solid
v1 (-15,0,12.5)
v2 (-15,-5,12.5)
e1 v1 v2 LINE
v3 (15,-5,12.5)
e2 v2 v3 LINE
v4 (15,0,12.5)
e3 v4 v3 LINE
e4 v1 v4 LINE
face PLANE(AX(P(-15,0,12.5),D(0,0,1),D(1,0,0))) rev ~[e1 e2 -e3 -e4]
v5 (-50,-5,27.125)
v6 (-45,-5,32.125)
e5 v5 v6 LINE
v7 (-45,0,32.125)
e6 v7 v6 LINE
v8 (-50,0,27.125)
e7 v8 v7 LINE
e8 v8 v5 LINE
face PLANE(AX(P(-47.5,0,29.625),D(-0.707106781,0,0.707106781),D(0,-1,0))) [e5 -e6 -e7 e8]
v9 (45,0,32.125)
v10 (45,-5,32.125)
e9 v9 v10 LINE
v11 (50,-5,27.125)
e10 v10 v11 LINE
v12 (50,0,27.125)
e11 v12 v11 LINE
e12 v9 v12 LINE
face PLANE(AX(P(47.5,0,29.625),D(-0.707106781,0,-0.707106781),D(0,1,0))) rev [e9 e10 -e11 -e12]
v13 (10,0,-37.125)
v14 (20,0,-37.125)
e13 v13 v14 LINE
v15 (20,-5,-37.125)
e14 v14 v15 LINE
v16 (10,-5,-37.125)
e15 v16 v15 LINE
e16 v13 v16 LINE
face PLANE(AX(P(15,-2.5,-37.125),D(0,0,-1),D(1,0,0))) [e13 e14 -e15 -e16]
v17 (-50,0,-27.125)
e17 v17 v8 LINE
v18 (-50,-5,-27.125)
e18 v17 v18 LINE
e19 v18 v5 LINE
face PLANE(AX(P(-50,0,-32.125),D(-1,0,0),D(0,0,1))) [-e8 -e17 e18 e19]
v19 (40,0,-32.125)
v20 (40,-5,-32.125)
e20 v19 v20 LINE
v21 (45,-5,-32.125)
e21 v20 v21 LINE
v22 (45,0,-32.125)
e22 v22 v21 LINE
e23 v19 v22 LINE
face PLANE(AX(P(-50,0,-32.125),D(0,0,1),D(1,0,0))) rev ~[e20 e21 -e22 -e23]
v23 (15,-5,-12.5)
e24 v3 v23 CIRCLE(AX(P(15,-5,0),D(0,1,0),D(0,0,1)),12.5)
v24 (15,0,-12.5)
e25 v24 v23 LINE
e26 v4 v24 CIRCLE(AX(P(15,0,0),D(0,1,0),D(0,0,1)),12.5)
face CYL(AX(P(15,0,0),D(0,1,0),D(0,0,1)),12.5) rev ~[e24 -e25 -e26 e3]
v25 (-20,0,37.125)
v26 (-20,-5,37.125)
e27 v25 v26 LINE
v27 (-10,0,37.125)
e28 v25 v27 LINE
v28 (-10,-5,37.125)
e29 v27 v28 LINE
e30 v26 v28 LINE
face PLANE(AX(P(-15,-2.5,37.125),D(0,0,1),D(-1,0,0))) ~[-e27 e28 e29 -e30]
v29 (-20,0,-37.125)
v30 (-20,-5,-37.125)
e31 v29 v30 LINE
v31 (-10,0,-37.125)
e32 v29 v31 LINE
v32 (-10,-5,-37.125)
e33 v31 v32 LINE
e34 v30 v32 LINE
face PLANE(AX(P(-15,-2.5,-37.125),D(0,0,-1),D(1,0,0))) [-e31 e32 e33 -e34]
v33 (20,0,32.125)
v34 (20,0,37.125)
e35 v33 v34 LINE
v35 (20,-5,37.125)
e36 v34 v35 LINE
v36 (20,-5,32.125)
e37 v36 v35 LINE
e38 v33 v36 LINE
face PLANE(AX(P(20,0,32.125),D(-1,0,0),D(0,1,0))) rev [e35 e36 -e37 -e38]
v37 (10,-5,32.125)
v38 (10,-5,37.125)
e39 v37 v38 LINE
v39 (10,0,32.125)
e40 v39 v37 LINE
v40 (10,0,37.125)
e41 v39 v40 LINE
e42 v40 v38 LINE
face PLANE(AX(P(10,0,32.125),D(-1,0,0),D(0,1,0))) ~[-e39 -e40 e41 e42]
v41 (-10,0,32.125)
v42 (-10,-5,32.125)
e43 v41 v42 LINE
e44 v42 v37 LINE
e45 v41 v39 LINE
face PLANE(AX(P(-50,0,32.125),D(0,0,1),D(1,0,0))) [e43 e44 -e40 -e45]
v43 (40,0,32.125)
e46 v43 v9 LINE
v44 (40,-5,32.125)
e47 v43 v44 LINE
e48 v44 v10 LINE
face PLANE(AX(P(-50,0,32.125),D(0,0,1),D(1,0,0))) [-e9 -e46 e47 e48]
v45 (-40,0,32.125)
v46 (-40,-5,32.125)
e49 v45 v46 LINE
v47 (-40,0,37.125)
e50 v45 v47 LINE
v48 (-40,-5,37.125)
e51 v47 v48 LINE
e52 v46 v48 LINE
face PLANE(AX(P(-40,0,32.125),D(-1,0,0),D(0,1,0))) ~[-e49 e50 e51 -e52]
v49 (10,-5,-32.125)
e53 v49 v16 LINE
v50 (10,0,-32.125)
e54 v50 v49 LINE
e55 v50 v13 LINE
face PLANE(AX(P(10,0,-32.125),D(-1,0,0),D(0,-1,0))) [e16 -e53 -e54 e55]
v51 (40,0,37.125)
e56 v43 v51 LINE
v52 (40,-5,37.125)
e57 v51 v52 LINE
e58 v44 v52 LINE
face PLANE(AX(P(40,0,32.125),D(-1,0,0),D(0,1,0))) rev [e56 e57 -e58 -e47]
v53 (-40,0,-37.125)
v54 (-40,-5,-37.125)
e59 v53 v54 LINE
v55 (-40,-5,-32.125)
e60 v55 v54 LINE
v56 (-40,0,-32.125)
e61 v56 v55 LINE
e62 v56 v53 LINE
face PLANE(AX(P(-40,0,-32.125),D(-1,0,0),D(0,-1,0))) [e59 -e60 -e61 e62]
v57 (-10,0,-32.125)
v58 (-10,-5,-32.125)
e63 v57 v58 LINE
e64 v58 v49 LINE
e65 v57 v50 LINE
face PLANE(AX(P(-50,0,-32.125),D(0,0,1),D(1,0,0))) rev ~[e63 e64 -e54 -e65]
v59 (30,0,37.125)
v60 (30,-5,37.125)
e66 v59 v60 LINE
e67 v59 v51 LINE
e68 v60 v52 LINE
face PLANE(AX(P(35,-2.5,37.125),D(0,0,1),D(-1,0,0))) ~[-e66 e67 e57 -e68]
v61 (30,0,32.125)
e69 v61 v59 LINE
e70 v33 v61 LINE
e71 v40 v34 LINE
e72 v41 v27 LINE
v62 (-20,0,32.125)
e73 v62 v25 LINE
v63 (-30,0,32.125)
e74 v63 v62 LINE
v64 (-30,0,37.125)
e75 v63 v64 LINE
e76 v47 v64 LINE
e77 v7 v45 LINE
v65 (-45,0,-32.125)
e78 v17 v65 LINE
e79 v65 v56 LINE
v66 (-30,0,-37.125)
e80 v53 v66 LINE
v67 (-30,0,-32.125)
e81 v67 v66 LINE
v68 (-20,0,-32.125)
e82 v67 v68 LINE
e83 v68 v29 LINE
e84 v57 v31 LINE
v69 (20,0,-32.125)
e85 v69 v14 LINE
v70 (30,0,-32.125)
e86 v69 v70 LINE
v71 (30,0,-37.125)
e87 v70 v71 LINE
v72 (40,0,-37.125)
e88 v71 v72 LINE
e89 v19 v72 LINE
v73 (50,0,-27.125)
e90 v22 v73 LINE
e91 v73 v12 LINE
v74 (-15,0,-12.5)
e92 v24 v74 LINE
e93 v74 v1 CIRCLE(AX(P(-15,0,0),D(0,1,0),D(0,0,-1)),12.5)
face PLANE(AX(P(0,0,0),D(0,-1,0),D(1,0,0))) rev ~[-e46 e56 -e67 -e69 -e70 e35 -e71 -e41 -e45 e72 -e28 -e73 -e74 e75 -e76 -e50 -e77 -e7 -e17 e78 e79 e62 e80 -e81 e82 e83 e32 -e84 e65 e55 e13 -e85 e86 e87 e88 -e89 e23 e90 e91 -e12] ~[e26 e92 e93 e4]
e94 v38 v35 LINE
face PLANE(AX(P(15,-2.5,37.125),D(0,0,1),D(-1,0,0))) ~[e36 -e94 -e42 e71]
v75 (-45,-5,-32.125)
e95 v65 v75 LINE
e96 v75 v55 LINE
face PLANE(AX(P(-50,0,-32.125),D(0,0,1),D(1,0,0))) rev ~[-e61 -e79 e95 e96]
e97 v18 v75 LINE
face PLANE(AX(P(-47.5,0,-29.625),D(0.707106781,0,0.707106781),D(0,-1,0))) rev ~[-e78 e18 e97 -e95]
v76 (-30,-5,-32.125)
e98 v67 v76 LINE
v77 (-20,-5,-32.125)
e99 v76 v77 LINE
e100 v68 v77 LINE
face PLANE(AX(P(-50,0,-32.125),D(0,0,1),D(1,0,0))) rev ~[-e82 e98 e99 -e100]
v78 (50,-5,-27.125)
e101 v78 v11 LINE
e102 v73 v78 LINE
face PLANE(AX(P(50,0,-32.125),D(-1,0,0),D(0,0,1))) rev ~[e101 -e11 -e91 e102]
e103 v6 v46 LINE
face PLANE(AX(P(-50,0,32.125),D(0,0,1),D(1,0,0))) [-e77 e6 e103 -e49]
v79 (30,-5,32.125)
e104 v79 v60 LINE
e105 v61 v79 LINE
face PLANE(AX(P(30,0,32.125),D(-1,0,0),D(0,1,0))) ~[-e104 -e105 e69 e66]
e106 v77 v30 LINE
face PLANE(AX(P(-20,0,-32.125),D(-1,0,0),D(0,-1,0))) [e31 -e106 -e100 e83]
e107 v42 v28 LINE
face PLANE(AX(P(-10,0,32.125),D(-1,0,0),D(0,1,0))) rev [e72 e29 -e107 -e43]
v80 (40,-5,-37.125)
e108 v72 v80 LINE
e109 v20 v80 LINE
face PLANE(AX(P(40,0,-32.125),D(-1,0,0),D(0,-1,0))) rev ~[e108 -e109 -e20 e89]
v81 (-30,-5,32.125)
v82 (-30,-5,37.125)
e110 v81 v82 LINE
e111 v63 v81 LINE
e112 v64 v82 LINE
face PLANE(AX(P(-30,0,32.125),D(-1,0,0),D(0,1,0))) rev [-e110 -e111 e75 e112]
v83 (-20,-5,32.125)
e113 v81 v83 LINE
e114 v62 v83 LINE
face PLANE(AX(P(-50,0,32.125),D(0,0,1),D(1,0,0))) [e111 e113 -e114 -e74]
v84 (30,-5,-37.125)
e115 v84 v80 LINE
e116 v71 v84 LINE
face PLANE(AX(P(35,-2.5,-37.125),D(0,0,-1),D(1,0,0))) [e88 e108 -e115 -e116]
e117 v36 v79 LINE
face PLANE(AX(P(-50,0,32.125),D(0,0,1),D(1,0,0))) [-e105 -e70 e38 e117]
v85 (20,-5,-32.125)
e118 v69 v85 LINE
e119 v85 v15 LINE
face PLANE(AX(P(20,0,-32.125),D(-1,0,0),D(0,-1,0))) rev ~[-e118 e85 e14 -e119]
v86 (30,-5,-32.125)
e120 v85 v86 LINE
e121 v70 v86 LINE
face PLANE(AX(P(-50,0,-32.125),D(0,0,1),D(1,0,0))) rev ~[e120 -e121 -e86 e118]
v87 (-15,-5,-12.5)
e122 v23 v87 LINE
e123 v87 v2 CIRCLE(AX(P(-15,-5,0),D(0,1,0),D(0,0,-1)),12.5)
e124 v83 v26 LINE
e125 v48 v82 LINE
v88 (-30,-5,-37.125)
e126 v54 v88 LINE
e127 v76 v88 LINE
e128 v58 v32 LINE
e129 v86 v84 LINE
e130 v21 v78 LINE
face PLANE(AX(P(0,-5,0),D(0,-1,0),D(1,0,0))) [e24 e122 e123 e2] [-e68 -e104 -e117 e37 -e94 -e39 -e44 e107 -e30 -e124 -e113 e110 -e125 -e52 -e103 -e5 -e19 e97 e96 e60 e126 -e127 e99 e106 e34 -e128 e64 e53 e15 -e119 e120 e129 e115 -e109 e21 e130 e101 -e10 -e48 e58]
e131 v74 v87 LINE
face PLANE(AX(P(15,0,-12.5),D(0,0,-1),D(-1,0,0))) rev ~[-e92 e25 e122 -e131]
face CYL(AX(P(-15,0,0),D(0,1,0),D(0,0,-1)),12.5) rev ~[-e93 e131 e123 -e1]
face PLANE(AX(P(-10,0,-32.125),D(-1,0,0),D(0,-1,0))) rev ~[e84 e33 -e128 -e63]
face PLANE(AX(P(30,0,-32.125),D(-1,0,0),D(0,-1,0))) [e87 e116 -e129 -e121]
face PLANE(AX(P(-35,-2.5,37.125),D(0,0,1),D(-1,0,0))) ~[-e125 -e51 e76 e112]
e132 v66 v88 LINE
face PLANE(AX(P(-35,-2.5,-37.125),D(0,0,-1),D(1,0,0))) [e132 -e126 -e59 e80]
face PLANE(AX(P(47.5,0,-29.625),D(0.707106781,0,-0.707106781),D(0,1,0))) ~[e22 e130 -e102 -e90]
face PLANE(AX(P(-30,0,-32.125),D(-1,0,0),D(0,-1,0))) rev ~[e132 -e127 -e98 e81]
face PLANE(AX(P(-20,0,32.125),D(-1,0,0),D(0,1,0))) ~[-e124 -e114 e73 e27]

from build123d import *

# Parameters (mm, degrees)
F0_W     = 100
F0_H     = 64.25
F1_DEPTH = 5
F2_SIZE  = 5
F3_W     = 10
F3_H     = 5
F4_DEPTH = 5


# Not quite as in the source:
# - a pattern or mirror of a feature is missing from the dataset's text; its kind, count and spacing are read off the source's solid


with BuildPart() as f1:
    # F0 (on Front) → F1 (new body)
    with BuildSketch(Plane.XZ):
        Rectangle(F0_W, F0_H)
        with BuildLine():
            Line((15, -12.5), (-15, -12.5))
            ThreePointArc((-15, -12.5), (-27.5, 0), (-15, 12.5))
            Line((-15, 12.5), (15, 12.5))
            ThreePointArc((15, 12.5), (27.5, 0), (15, -12.5))
        make_face(mode=Mode.SUBTRACT)
    extrude(amount=F1_DEPTH)

    # F2
    f2_edges = [f1.edges().sort_by_distance(p)[0] for p in [
        (-50, -2.5, 32.125),
        (50, -2.5, 32.125),
        (-50, -2.5, -32.125),
        (50, -2.5, -32.125),
    ]]
    chamfer(f2_edges, length=F2_SIZE)

    # F3 (on face) → F4 (join)
    with BuildSketch(Plane(origin=(0, 0, -32.125), x_dir=(1, 0, 0), z_dir=(0, 0, -1))):
        with Locations((35, 2.5)):
            Rectangle(F3_W, F3_H)
        with Locations((15, 2.5)):
            Rectangle(F3_W, F3_H)
        with Locations((-15, 2.5)):
            Rectangle(F3_W, F3_H)
        with Locations((-35, 2.5)):
            Rectangle(F3_W, F3_H)
    f4 = extrude(amount=F4_DEPTH)

    # F4_copies: F4 across plane
    add(f4.mirror(Plane.XY))


solid = f1.part
